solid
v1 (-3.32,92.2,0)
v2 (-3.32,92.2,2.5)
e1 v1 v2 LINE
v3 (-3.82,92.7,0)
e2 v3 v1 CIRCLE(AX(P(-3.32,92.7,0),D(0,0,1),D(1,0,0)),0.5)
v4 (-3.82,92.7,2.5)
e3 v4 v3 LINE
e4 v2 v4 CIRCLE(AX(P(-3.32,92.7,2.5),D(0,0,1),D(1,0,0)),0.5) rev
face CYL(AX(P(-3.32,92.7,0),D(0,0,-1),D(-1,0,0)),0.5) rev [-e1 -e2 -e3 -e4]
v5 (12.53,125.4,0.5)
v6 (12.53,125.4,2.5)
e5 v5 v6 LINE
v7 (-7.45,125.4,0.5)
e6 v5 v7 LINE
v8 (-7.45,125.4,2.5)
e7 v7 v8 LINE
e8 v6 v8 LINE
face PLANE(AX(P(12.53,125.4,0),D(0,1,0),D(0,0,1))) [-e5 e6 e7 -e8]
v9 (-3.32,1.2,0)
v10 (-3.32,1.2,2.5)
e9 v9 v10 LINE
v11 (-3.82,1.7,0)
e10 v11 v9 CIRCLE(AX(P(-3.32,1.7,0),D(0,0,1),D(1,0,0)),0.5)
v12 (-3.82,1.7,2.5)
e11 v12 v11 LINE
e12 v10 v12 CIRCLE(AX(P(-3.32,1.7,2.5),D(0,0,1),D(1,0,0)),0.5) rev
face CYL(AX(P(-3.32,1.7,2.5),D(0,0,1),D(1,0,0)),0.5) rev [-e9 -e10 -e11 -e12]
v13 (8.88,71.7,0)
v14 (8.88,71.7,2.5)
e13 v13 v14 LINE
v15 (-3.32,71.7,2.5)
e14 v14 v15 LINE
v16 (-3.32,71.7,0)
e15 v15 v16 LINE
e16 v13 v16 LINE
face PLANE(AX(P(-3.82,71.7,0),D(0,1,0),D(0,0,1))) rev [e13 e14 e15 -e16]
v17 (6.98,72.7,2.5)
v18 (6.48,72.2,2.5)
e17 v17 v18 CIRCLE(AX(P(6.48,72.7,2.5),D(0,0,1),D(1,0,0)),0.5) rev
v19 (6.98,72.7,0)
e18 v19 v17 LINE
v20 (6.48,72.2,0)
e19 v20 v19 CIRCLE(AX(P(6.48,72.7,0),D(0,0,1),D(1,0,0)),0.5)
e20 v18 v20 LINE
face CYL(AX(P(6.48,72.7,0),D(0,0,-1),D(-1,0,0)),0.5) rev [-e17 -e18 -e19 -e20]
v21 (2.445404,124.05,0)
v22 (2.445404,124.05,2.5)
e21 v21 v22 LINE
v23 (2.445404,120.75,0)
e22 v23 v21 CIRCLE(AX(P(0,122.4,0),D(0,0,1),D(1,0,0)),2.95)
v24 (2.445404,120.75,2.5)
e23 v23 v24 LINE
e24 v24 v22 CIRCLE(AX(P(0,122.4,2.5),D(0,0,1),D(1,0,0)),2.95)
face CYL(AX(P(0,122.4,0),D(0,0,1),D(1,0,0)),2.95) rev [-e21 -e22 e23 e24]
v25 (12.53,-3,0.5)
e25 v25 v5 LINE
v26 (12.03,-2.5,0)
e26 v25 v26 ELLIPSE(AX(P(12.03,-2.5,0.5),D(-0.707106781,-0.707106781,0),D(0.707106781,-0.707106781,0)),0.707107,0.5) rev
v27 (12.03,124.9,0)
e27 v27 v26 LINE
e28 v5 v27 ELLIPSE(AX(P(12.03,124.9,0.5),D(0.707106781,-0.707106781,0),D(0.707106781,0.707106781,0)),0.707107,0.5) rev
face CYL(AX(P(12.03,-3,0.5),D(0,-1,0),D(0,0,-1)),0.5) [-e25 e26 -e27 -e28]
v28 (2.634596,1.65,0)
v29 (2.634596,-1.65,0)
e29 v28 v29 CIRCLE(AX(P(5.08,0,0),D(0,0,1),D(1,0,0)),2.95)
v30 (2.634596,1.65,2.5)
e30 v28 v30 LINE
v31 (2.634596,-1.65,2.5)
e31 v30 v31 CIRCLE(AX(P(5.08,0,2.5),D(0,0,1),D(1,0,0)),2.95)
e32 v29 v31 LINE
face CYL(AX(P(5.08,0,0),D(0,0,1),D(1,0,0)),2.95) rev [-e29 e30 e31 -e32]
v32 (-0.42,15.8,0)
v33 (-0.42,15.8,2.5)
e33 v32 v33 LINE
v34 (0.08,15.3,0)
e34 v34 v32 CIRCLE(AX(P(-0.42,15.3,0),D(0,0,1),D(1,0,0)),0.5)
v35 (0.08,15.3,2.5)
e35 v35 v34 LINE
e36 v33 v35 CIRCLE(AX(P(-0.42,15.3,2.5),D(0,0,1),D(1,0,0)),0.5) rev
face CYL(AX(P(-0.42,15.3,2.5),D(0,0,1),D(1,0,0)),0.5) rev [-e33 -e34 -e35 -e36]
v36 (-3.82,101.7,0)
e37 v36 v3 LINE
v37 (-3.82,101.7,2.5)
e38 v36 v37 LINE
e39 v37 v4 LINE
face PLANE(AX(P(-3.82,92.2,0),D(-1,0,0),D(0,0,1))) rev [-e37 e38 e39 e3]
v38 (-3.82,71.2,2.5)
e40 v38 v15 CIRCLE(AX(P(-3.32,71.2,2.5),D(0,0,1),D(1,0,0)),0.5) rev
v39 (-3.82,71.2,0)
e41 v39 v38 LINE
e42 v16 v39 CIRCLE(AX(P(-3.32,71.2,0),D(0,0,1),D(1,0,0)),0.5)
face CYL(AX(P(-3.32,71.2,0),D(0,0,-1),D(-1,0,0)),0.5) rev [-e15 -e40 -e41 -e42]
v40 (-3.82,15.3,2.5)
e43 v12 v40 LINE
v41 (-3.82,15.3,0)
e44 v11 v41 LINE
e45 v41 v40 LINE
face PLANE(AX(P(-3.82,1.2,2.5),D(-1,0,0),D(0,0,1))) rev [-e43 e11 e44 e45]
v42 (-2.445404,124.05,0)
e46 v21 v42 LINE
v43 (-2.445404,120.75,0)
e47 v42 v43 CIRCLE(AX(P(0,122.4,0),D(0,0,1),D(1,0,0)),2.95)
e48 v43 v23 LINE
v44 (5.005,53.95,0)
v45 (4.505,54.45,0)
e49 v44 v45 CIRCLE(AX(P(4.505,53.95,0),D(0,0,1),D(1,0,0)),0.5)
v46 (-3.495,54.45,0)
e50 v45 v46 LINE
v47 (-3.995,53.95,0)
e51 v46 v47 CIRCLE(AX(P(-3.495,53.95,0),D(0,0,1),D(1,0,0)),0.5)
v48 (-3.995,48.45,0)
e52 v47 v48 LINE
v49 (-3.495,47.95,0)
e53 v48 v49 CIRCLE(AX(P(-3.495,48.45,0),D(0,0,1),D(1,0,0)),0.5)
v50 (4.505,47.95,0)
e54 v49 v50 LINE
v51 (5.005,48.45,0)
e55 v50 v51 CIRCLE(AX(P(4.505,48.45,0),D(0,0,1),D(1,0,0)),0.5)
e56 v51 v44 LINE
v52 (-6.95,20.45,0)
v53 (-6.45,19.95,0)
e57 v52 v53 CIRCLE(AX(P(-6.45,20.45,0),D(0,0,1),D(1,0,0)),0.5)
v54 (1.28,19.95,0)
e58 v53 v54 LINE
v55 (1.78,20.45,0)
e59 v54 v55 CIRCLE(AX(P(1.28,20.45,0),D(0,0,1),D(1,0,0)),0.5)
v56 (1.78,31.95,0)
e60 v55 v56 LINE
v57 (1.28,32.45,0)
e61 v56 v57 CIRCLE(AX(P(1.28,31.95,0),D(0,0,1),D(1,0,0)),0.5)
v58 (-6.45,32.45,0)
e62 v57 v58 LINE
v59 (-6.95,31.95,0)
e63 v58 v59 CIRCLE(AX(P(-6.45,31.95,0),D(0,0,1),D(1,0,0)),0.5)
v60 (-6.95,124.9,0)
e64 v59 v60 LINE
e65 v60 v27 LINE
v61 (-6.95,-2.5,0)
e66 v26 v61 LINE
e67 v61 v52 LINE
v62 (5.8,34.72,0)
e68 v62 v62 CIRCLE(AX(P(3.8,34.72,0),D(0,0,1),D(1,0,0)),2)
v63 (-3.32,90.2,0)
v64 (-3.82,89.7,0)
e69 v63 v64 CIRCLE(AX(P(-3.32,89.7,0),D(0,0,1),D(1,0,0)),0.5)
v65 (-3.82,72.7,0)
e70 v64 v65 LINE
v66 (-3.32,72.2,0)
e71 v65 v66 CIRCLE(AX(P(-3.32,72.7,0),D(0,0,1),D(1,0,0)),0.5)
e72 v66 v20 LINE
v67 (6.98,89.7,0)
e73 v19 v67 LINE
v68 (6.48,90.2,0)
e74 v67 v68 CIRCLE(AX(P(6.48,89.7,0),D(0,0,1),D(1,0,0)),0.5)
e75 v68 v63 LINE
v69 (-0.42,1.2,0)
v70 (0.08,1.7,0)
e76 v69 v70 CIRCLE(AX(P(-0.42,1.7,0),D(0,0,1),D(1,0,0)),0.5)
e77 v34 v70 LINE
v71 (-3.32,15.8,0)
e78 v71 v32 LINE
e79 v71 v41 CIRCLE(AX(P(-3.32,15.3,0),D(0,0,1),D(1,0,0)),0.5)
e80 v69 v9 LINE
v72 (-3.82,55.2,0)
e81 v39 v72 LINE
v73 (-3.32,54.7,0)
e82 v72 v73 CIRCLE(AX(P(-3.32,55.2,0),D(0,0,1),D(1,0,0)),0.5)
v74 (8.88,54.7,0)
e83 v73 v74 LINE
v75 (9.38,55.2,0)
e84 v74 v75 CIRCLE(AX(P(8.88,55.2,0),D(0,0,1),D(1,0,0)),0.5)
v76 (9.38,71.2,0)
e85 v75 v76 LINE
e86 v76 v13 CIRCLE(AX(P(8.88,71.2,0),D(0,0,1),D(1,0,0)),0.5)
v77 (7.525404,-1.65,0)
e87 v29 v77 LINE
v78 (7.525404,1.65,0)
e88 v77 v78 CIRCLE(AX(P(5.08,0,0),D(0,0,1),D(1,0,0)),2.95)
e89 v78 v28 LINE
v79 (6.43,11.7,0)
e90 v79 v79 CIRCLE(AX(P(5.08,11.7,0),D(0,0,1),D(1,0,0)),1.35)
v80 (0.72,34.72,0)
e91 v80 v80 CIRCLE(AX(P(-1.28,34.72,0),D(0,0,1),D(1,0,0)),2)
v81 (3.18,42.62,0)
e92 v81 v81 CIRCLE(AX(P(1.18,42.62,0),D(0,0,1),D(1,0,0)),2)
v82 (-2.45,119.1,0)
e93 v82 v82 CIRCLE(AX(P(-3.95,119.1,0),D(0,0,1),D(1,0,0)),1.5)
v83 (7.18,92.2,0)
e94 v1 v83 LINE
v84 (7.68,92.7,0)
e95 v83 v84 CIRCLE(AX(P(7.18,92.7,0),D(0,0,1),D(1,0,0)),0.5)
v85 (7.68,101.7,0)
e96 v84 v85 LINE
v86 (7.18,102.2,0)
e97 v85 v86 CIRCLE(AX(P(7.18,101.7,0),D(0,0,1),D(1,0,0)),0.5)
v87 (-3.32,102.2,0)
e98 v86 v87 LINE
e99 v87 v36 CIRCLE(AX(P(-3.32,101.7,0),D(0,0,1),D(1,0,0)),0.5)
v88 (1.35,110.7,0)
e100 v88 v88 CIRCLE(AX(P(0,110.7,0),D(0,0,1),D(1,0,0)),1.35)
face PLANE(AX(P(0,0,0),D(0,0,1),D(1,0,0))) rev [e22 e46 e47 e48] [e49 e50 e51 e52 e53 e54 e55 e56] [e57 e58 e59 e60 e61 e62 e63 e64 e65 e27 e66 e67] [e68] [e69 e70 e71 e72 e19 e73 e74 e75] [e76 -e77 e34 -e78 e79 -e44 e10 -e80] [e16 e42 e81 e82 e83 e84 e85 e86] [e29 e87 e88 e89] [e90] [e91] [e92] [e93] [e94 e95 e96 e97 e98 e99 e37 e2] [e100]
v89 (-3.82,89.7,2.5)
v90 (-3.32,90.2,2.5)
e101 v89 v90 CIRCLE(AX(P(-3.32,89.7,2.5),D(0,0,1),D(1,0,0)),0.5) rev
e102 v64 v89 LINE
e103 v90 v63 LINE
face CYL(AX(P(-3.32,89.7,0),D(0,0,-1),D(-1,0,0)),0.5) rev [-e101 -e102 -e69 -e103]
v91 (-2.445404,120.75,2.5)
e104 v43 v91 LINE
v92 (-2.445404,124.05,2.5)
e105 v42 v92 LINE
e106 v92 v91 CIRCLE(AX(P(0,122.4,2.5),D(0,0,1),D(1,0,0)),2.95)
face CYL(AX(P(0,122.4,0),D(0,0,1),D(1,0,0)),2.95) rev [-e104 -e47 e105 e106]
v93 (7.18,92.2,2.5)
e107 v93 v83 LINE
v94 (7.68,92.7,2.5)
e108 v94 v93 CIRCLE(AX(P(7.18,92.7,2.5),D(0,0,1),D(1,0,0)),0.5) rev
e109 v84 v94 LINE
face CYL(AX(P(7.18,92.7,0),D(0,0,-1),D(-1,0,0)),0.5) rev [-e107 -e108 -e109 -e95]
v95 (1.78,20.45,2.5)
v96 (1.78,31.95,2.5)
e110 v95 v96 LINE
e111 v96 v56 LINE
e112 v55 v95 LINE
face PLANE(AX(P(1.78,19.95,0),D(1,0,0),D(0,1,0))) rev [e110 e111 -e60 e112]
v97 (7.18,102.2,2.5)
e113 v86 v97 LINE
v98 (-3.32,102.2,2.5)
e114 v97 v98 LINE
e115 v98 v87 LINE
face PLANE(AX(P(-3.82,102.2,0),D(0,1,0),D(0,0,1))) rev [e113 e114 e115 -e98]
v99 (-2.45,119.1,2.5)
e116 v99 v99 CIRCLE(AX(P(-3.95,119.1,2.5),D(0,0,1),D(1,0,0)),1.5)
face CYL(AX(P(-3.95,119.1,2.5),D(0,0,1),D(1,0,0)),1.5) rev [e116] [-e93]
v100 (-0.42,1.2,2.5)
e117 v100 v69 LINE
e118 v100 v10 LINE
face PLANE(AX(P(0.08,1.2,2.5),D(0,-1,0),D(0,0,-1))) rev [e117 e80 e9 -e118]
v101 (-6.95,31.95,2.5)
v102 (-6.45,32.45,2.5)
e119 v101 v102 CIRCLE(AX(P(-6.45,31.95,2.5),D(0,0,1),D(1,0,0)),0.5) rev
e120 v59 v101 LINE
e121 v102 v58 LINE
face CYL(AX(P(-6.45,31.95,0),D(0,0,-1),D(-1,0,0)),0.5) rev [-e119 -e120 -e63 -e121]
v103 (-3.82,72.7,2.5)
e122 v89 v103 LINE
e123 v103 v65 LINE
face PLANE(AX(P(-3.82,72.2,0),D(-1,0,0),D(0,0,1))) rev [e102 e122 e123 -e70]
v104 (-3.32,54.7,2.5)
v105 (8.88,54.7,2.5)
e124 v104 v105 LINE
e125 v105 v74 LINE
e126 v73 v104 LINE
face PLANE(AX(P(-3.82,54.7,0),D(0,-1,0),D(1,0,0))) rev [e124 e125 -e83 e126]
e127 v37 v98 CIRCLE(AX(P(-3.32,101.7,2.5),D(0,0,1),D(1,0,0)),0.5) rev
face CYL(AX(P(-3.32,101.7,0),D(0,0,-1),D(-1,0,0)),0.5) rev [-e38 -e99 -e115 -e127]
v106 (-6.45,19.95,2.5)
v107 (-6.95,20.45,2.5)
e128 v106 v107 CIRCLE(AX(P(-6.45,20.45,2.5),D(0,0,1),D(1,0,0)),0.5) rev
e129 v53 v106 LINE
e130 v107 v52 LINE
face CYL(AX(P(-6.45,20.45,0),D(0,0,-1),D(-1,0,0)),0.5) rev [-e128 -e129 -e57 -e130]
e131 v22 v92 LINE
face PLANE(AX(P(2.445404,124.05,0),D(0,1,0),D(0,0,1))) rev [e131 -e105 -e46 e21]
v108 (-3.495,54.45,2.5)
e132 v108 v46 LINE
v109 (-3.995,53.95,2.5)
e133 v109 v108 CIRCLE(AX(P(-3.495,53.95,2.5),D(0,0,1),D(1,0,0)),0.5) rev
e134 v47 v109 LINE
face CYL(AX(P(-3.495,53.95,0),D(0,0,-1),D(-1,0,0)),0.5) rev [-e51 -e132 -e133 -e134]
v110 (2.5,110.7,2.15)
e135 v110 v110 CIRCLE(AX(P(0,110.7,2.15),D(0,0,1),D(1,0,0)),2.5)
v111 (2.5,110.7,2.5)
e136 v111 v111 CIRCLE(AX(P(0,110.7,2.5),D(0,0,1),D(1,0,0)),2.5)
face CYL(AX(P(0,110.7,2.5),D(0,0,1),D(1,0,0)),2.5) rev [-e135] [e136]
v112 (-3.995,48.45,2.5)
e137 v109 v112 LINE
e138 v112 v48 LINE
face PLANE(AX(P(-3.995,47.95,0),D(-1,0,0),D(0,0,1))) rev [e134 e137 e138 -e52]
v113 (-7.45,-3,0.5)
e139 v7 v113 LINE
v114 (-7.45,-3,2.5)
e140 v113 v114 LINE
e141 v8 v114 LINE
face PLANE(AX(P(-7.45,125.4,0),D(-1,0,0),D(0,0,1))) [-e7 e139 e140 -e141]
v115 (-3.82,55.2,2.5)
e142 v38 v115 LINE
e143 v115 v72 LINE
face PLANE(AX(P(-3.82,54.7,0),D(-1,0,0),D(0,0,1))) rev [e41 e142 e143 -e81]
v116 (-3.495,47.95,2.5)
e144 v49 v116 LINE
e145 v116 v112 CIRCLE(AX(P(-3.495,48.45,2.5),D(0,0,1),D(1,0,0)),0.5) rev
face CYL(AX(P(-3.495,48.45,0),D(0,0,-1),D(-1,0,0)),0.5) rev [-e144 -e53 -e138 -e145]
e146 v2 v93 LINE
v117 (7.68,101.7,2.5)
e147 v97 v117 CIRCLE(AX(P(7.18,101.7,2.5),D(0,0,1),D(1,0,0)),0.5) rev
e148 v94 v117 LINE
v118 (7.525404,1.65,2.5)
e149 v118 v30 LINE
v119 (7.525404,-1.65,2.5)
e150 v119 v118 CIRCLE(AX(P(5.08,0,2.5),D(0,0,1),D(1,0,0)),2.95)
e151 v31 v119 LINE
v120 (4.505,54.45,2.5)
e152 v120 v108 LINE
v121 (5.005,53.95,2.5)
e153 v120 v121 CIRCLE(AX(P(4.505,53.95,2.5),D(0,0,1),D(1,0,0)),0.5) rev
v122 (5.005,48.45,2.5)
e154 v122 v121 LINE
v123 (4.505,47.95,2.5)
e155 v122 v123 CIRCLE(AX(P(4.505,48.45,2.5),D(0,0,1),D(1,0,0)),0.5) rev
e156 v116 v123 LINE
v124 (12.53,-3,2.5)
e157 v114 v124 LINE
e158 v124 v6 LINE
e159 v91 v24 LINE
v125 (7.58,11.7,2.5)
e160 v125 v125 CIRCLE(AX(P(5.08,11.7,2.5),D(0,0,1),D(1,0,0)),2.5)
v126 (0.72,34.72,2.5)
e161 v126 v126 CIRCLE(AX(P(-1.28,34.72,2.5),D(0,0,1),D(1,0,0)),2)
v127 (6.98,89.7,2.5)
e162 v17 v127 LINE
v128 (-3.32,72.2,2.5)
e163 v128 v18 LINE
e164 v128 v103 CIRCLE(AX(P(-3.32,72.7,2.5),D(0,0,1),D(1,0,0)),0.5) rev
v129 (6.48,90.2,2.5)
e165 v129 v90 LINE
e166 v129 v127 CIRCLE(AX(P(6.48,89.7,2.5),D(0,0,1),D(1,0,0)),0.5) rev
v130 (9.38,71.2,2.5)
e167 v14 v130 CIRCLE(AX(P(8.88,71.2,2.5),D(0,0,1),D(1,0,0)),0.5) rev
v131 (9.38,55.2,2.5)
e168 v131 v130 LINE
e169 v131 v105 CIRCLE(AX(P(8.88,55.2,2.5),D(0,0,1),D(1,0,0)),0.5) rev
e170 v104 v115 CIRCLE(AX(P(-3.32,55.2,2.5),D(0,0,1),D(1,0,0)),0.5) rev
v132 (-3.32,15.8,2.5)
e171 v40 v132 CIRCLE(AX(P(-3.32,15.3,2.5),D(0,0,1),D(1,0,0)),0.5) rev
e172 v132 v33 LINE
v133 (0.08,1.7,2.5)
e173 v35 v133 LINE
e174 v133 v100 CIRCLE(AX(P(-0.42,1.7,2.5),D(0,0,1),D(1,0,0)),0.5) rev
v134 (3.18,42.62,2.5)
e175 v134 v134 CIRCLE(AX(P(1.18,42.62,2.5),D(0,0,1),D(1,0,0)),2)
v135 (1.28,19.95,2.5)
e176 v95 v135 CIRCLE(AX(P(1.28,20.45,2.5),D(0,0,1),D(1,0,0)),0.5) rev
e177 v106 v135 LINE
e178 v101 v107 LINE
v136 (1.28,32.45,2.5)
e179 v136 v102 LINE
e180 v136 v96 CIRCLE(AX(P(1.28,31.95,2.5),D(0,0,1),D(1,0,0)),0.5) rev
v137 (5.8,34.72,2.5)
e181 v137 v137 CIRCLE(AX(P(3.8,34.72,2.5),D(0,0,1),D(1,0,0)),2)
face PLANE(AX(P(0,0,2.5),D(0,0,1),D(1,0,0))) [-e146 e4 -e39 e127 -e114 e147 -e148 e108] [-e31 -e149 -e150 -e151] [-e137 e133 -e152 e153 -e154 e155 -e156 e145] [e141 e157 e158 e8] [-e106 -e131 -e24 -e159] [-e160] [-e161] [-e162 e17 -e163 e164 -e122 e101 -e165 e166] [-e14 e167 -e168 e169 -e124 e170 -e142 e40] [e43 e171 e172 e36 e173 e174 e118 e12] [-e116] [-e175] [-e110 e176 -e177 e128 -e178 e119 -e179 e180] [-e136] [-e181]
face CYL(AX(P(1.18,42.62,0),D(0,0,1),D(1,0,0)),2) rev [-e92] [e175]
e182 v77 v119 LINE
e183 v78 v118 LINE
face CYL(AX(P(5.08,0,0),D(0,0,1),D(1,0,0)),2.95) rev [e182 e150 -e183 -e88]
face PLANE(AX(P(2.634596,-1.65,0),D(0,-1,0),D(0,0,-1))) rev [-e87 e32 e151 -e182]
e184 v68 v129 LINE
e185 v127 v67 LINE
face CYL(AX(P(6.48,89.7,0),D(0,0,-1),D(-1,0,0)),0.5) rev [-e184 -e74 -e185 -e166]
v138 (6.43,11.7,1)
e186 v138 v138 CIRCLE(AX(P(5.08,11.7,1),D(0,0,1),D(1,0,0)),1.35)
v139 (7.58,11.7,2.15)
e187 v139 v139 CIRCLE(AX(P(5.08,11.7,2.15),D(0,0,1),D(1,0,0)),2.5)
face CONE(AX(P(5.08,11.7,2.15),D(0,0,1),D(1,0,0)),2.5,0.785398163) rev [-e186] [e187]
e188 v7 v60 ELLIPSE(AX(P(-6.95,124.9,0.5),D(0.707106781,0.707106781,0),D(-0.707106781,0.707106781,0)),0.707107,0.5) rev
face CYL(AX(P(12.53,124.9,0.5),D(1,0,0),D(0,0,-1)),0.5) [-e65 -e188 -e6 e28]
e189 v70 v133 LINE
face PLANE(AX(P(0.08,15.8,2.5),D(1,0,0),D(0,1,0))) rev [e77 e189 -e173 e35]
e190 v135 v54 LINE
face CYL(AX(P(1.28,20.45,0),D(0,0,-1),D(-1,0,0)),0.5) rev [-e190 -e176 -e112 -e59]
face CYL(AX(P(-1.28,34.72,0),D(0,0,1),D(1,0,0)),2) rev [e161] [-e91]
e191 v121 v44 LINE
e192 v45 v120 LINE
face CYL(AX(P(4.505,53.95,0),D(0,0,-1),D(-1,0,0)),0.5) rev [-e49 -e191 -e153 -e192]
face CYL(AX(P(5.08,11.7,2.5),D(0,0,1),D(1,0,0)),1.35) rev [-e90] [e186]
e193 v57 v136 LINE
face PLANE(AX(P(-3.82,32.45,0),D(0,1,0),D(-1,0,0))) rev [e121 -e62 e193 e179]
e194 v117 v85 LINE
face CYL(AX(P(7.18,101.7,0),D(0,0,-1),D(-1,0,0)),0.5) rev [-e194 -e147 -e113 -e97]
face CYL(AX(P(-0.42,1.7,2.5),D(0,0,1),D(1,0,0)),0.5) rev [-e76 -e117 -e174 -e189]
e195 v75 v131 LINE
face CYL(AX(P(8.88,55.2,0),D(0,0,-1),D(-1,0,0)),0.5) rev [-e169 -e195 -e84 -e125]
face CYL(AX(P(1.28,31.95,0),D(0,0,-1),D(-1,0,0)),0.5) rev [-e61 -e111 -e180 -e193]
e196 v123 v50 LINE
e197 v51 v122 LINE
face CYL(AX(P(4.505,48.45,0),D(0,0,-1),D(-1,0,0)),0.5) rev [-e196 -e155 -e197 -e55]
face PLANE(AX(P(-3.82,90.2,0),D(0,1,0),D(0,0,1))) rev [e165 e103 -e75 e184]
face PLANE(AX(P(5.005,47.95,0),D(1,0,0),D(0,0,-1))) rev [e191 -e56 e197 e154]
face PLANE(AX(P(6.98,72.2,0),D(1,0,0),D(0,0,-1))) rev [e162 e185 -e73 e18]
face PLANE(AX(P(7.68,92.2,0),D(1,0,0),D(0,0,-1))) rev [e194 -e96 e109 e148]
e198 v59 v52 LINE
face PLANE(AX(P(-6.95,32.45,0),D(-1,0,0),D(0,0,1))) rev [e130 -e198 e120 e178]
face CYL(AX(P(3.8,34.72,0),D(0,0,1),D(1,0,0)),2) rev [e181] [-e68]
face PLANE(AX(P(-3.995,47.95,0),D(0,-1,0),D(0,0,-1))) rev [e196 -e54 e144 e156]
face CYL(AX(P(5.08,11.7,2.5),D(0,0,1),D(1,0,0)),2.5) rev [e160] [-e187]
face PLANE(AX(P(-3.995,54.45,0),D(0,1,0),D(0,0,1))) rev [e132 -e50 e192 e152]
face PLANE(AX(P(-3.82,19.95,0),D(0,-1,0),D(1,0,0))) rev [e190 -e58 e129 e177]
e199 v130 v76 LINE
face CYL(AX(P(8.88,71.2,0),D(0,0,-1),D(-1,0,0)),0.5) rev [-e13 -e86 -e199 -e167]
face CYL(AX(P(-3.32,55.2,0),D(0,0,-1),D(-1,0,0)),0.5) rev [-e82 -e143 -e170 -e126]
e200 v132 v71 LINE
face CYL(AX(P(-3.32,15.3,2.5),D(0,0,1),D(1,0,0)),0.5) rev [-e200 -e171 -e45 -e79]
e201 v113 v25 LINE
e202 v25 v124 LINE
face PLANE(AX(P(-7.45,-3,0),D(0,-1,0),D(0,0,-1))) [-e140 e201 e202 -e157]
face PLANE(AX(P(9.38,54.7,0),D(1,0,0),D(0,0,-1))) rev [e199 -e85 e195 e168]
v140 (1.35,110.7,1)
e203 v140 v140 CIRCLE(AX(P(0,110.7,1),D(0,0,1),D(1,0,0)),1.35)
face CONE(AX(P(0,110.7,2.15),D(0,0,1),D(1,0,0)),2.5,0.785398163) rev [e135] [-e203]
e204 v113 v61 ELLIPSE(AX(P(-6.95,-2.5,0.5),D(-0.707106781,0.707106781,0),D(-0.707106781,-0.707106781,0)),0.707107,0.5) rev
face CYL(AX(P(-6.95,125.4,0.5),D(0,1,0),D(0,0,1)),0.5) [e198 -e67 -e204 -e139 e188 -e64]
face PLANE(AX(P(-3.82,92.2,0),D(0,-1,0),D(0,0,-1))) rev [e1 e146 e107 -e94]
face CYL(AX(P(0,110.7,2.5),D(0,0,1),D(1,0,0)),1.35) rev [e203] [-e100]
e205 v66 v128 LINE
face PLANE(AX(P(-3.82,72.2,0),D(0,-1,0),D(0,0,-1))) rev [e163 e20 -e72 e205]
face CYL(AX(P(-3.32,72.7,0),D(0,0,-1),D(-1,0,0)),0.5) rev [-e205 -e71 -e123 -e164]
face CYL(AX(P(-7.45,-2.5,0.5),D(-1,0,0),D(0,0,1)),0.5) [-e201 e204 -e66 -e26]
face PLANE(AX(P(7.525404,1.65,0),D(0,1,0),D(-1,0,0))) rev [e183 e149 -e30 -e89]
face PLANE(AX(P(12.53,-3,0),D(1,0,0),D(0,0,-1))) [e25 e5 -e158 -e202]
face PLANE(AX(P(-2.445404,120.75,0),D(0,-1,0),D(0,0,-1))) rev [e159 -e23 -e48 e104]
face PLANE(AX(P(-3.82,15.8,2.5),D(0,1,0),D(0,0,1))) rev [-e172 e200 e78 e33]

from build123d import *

# Parameters (mm, degrees)
SKETCH1_W                                      = 19.98
SKETCH1_H                                      = 128.4
BOSS_EXTRUDE1_DEPTH                            = 2.5
CUT_EXTRUDE1_DEPTH                             = 127.049239982
CUT_EXTRUDE2_DEPTH                             = 127.049239982
SKETCH4_W                                      = 3.9
SKETCH4_H                                      = 14.6
CUT_EXTRUDE3_DEPTH                             = 127.049239982
F_3_0_3_DIAMETER_HOLE1_D                       = 3
CSK_FOR_M2_5_FLAT_HEAD_MACHINE_SCREW1_AT_COUNT = 2
CSK_FOR_M2_5_FLAT_HEAD_MACHINE_SCREW1_AT_PITCH = 99.130249672
USB_DEPTH                                      = 127.049239982
SKETCH10_R                                     = 2
LEDS_DEPTH                                     = 127.049239982
SKETCH11_R                                     = 2
SINGLE_LED_DEPTH                               = 127.049239982
SKETCH13_W                                     = 9
SKETCH13_H                                     = 6.5
DISABLE_COMMS_DEPTH                            = 127.049239982
SKETCH14_W                                     = 13.2
SKETCH14_H                                     = 17
RJ45_DEPTH                                     = 127.049239982
SKETCH15_W                                     = 10.8
SKETCH15_H                                     = 18
OUTPUT_DEPTH                                   = 127.049239982
SKETCH16_W                                     = 11.5
SKETCH16_H                                     = 10
POWER_DEPTH                                    = 127.049239982
FILLETS_R                                      = 0.5
FILLET2_R                                      = 0.5


with BuildPart() as part:
    # Sketch1 → Boss-Extrude1 (new body)
    with BuildSketch(Plane.XY.offset(2.5)):
        with Locations((2.54, 61.2)):
            Rectangle(SKETCH1_W, SKETCH1_H)
    extrude(amount=-BOSS_EXTRUDE1_DEPTH)

    # Sketch2 → Cut-Extrude1 (cut, through all)
    with BuildSketch(Plane.XY.offset(2.5)):
        with BuildLine():
            Line((2.445403852, 124.05), (-2.445403852, 124.05))
            ThreePointArc((-2.445403852, 124.05), (-2.95, 122.4), (-2.445403852, 120.75))
            Line((-2.445403852, 120.75), (2.445403852, 120.75))
            ThreePointArc((2.445403852, 120.75), (2.95, 122.4), (2.445403852, 124.05))
        make_face()
    extrude(amount=-CUT_EXTRUDE1_DEPTH, mode=Mode.SUBTRACT)

    # Sketch3 → Cut-Extrude2 (cut, through all)
    with BuildSketch(Plane.XY.offset(2.5)):
        with BuildLine():
            Line((7.525403852, 1.65), (2.634596148, 1.65))
            ThreePointArc((2.634596148, 1.65), (2.13, 0), (2.634596148, -1.65))
            Line((2.634596148, -1.65), (7.525403852, -1.65))
            ThreePointArc((7.525403852, -1.65), (8.03, 0), (7.525403852, 1.65))
        make_face()
    extrude(amount=-CUT_EXTRUDE2_DEPTH, mode=Mode.SUBTRACT)

    # Sketch4 → Cut-Extrude3 (cut, through all)
    with BuildSketch(Plane(origin=(0, 0, 0), x_dir=(-1, 0, 0), z_dir=(0, 0, -1))):
        with Locations((1.87, 8.5)):
            Rectangle(SKETCH4_W, SKETCH4_H)
    extrude(amount=-CUT_EXTRUDE3_DEPTH, mode=Mode.SUBTRACT)

    # Ø3.0 (3) Diameter Hole1 (through all)
    with Locations(Plane.XY.offset(2.5)):
        with Locations((-3.95, 119.1)):
            Hole(F_3_0_3_DIAMETER_HOLE1_D / 2)

    # Sketch7 → CSK for M2.5 Flat Head Machine Screw1 (revolve, cut)
    with BuildSketch(Plane(origin=(5.08, 11.7, 2.5), x_dir=(0, -1, 0), z_dir=(1, 0, 0))):
        Polygon((0, 0), (0, 2.5), (1.35, 2.5), (1.35, 1.5), (2.5, 0.35), (2.5, 0), align=None)
    csk_for_m2_5_flat_head_machine_screw1 = revolve(axis=Axis((5.08, 11.7, 8.85), (0, 0, -1)), mode=Mode.SUBTRACT)

    # CSK for M2.5 Flat Head Machine Screw1 at: CSK for M2.5 Flat Head Machine Screw1 ×2
    with Locations(*[Vector(-0.05124570972853528, 0.9986860754183062, 0) * (i * CSK_FOR_M2_5_FLAT_HEAD_MACHINE_SCREW1_AT_PITCH) for i in range(1, CSK_FOR_M2_5_FLAT_HEAD_MACHINE_SCREW1_AT_COUNT)]):
        add(csk_for_m2_5_flat_head_machine_screw1, mode=Mode.SUBTRACT)

    # Sketch9 → USB (cut, through all)
    with BuildSketch(Plane.XY.offset(2.5)):
        Polygon((-3.82, 19.95), (1.78, 19.95), (1.78, 32.45), (-3.82, 32.45), (-6.95, 32.45), (-6.95, 19.95), align=None)
    extrude(amount=-USB_DEPTH, mode=Mode.SUBTRACT)

    # Sketch10 → LEDs (cut, through all)
    with BuildSketch(Plane.XY.offset(2.5)):
        with Locations((-1.28, 34.72)):
            Circle(SKETCH10_R)
        with Locations((3.8, 34.72)):
            Circle(SKETCH10_R)
    extrude(amount=-LEDS_DEPTH, mode=Mode.SUBTRACT)

    # Sketch11 → Single LED (cut, through all)
    with BuildSketch(Plane.XY.offset(2.5)):
        with Locations((1.18, 42.62)):
            Circle(SKETCH11_R)
    extrude(amount=-SINGLE_LED_DEPTH, mode=Mode.SUBTRACT)

    # Sketch13 → Disable comms (cut, through all)
    with BuildSketch(Plane.XY.offset(2.5)):
        with Locations((0.505, 51.2)):
            Rectangle(SKETCH13_W, SKETCH13_H)
    extrude(amount=-DISABLE_COMMS_DEPTH, mode=Mode.SUBTRACT)

    # Sketch14 → RJ45 (cut, through all)
    with BuildSketch(Plane.XY.offset(2.5)):
        with Locations((2.78, 63.2)):
            Rectangle(SKETCH14_W, SKETCH14_H)
    extrude(amount=-RJ45_DEPTH, mode=Mode.SUBTRACT)

    # Sketch15 → Output (cut, through all)
    with BuildSketch(Plane.XY.offset(2.5)):
        with Locations((1.58, 81.2)):
            Rectangle(SKETCH15_W, SKETCH15_H)
    extrude(amount=-OUTPUT_DEPTH, mode=Mode.SUBTRACT)

    # Sketch16 → Power (cut, through all)
    with BuildSketch(Plane.XY.offset(2.5)):
        with Locations((1.93, 97.2)):
            Rectangle(SKETCH16_W, SKETCH16_H)
    extrude(amount=-POWER_DEPTH, mode=Mode.SUBTRACT)

    # Fillets
    fillets_edges = [part.edges().sort_by_distance(p)[0] for p in [
        (5.005, 54.45, 1.25),
        (5.005, 47.95, 1.25),
        (-3.995, 47.95, 1.25),
        (-3.995, 54.45, 1.25),
        (9.38, 54.7, 1.25),
        (-3.82, 54.7, 1.25),
        (-3.82, 71.7, 1.25),
        (9.38, 71.7, 1.25),
        (6.98, 72.2, 1.25),
        (-3.82, 72.2, 1.25),
        (-3.82, 90.2, 1.25),
        (6.98, 90.2, 1.25),
        (7.68, 92.2, 1.25),
        (-3.82, 92.2, 1.25),
        (-3.82, 102.2, 1.25),
        (7.68, 102.2, 1.25),
        (-3.82, 15.8, 1.25),
        (-3.82, 1.2, 1.25),
        (0.08, 1.2, 1.25),
        (0.08, 15.8, 1.25),
        (-6.95, 19.95, 1.25),
        (-6.95, 32.45, 1.25),
        (1.78, 32.45, 1.25),
        (1.78, 19.95, 1.25),
    ]]
    fillet(fillets_edges, radius=FILLETS_R)

    # Fillet2
    fillet2_edges = [part.edges().sort_by_distance(p)[0] for p in [
        (-7.45, 61.2, 0),
        (2.54, -3, 0),
        (12.53, 61.2, 0),
        (2.54, 125.4, 0),
    ]]
    fillet(fillet2_edges, radius=FILLET2_R - 0.0001)  # a hair under: the kernel refuses the full size


solid = part.part
